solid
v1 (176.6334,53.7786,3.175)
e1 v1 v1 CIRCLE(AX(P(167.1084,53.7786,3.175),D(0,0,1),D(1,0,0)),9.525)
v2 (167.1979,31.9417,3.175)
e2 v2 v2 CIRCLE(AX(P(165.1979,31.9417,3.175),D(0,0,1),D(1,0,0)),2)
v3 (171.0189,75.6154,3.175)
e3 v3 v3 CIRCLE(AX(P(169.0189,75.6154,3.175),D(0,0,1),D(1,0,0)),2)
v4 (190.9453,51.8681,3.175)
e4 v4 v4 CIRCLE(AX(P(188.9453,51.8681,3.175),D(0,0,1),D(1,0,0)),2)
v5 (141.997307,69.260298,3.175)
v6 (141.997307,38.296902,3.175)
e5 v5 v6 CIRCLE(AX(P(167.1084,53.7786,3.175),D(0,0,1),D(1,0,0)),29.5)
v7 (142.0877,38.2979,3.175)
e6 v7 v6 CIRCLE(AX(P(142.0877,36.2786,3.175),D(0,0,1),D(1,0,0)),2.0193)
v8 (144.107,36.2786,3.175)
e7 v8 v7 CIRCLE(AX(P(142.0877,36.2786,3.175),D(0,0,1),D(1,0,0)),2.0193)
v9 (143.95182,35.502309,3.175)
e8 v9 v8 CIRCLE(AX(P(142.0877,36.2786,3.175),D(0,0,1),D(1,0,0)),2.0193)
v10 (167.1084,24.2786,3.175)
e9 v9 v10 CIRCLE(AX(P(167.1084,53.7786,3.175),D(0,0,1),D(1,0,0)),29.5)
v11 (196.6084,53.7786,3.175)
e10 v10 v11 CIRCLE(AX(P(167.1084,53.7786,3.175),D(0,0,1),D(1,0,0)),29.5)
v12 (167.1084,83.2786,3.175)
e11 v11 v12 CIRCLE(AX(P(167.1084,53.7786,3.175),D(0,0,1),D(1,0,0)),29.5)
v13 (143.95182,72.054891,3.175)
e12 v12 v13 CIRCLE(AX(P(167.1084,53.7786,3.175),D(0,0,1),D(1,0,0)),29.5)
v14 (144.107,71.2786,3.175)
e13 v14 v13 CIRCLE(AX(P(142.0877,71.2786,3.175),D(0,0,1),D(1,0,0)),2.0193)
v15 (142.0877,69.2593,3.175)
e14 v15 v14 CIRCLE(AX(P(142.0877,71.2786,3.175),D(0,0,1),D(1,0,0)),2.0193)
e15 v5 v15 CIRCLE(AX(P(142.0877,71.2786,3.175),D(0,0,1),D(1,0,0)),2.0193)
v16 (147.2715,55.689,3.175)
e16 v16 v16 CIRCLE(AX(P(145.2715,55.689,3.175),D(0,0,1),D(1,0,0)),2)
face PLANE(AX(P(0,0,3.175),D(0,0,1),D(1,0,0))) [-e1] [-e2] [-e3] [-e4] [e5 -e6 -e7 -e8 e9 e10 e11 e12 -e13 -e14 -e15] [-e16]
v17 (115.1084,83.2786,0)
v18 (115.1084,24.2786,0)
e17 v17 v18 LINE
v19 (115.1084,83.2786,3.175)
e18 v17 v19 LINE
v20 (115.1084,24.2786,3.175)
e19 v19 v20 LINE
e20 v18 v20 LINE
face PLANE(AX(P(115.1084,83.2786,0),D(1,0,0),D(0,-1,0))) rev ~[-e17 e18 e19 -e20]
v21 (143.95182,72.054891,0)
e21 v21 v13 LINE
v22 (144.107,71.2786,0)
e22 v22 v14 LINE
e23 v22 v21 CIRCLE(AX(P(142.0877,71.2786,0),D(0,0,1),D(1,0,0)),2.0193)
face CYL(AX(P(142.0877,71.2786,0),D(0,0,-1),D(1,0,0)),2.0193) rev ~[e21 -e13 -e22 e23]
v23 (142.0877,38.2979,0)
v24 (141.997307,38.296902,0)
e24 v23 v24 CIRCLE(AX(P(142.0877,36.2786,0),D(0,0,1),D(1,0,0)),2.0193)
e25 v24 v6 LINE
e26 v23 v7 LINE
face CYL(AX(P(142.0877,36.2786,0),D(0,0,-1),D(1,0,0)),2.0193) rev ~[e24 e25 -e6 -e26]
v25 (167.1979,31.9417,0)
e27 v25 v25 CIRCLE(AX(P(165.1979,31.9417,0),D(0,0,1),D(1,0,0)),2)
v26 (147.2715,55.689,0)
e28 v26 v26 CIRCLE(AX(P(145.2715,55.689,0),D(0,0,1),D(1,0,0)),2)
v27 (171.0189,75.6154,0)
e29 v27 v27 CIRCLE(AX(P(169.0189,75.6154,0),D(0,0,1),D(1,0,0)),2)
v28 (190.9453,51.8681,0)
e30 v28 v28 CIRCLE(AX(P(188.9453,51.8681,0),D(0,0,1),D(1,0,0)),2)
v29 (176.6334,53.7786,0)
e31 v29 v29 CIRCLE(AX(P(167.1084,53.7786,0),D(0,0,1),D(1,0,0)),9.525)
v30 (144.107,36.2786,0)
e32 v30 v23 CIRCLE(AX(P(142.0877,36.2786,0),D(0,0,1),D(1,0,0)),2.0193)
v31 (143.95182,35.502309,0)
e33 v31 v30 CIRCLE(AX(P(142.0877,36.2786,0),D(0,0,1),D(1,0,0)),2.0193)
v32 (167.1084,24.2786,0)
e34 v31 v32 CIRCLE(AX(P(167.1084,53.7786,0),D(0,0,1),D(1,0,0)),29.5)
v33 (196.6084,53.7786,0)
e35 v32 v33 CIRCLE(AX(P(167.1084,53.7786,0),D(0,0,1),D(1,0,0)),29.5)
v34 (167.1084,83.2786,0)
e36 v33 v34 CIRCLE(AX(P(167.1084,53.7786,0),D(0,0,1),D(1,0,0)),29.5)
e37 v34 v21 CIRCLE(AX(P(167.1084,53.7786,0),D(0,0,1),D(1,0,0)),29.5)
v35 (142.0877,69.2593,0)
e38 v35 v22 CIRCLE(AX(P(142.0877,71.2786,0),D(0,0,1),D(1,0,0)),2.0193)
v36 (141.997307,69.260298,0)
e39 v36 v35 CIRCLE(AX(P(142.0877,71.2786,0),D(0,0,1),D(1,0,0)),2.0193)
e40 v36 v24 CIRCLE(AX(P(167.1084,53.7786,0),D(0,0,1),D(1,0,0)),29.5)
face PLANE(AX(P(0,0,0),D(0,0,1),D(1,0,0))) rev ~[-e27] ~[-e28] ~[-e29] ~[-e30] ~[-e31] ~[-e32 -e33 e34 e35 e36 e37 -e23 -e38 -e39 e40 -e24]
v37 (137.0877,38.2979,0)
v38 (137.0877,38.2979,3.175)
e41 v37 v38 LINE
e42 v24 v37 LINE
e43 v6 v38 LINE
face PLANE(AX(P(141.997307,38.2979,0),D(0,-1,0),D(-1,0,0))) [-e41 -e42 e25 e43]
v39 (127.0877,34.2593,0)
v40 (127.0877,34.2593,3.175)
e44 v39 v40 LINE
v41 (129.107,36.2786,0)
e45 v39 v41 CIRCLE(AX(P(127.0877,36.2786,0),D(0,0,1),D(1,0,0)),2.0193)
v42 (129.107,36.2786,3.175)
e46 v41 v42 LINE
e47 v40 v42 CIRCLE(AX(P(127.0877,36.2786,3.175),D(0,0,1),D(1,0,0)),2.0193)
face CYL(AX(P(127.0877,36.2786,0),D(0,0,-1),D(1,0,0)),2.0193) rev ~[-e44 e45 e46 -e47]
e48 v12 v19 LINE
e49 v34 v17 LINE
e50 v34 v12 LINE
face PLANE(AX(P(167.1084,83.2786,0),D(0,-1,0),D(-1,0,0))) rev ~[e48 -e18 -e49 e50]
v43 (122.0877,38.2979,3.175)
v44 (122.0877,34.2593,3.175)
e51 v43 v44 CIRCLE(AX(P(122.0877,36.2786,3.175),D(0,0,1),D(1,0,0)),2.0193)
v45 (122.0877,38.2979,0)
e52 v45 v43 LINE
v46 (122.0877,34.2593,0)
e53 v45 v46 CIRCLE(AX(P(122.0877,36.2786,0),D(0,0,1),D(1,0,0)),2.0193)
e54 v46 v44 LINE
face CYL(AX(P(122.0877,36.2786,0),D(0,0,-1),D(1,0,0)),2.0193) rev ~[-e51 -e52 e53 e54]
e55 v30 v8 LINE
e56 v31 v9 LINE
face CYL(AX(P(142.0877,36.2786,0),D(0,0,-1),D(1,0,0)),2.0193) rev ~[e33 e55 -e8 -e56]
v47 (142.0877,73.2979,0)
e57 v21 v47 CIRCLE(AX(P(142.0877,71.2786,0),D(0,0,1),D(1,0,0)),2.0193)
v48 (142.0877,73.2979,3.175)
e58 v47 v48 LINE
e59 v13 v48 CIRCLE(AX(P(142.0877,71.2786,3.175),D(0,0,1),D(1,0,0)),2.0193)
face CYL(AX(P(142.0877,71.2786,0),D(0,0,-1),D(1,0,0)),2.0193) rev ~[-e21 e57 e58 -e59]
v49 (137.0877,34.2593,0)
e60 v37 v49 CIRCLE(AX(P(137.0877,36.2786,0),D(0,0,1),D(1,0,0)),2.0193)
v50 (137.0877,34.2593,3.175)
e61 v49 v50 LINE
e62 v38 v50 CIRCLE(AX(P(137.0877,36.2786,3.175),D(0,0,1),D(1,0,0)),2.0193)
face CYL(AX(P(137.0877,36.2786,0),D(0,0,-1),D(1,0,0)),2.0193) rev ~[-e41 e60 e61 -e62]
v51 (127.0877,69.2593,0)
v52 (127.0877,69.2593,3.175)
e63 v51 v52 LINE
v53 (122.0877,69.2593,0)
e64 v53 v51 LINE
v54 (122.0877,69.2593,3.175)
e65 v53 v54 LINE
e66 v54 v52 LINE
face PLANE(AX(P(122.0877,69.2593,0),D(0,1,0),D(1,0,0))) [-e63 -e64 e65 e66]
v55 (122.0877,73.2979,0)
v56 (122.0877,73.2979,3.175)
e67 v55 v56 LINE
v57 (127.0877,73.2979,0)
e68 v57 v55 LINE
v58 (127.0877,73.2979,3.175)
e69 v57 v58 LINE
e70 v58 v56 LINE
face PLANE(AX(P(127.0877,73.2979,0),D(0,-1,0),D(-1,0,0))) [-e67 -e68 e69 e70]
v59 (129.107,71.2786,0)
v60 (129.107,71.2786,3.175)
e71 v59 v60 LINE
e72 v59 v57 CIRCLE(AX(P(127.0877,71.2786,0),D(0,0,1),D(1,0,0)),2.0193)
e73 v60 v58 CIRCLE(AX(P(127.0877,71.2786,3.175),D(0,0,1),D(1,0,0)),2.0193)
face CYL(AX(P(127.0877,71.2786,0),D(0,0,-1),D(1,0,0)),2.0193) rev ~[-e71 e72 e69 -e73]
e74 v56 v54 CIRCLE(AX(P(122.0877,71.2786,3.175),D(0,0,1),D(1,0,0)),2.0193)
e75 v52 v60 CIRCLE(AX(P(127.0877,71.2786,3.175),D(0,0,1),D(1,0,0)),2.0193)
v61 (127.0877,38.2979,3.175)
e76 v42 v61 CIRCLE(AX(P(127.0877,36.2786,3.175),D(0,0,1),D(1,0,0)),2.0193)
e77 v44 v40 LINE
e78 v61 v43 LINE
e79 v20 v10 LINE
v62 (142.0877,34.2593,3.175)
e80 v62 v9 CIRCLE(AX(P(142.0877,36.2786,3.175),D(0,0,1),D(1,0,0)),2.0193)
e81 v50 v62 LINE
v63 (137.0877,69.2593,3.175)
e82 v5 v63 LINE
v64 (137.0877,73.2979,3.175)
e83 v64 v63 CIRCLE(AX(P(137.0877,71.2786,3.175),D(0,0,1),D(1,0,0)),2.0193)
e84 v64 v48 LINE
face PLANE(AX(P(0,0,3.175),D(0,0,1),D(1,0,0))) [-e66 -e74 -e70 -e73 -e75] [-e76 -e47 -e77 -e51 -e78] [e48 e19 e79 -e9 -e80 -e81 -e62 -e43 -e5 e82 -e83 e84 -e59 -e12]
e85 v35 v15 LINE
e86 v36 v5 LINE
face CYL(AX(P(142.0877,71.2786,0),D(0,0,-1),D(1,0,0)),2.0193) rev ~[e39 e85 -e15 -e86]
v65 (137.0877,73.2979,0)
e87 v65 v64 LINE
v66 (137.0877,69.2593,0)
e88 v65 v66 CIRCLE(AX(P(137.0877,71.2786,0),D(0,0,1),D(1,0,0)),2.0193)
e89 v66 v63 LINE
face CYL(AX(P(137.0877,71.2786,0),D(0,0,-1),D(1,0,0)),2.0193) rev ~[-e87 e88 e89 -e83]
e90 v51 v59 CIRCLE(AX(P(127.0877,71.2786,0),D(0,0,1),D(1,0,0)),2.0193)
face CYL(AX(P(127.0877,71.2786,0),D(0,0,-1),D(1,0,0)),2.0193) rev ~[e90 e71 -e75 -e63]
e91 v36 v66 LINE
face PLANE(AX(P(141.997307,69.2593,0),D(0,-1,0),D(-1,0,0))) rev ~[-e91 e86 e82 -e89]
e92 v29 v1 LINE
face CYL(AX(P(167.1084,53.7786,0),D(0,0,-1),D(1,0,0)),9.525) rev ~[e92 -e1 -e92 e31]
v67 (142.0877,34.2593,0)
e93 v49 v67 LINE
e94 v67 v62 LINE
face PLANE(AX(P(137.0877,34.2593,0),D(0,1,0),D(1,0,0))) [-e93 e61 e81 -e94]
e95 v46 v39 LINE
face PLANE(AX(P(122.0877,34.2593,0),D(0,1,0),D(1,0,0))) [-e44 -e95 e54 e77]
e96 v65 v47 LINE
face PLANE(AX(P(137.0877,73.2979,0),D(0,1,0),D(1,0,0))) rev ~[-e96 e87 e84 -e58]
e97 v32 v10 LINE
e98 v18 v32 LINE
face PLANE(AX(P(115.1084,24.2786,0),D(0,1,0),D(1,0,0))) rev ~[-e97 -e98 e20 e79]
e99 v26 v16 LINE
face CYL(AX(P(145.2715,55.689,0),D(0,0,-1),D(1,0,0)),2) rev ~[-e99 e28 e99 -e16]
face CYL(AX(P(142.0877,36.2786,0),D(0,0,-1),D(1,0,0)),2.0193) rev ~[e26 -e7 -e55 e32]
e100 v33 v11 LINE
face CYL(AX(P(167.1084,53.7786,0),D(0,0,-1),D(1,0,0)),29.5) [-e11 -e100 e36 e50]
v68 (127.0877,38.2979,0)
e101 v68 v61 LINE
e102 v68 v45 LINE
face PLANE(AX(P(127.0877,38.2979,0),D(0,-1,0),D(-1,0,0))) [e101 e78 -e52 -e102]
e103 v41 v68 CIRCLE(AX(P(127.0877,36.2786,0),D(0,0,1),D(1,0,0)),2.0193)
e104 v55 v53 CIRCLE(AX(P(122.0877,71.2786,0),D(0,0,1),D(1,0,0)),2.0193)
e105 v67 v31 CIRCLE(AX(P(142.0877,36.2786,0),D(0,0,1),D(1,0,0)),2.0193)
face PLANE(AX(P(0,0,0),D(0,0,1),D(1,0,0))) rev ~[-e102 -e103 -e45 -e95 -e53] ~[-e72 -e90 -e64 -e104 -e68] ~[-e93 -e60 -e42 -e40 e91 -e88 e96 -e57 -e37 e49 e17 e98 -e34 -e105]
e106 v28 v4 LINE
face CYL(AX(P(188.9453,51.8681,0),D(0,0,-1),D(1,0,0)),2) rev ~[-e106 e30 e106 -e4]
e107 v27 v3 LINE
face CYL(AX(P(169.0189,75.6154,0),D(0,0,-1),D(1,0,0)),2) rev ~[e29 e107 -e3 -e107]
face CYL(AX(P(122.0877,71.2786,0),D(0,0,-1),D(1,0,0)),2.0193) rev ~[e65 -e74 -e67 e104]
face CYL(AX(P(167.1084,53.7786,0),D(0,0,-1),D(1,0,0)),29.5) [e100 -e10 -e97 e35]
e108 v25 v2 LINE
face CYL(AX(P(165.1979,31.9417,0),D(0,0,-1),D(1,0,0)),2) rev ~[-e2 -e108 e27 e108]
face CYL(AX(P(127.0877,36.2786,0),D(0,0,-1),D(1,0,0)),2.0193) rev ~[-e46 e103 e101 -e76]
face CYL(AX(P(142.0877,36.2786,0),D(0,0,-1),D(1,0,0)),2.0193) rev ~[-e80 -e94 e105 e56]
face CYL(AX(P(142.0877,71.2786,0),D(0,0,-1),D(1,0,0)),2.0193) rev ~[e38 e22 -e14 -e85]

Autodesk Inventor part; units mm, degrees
ref_plane "YZ Plane" through (0, 0, 0) normal (1, 0, 0) x (0, 1, 0)
ref_plane "XZ Plane" through (0, 0, 0) normal (0, 1, 0) x (-1, 0, 0)
ref_plane "XY Plane" through (0, 0, 0) normal (0, 0, 1) x (1, 0, 0)
sketch "Sketch1" plane through (0, 0, 0) normal (0, 0, 1) x (1, 0, 0)
  circle A0 centre (167.1084, 53.7786) radius 29.5
  line L0 (167.1084, 83.2786) -> (115.1084, 83.2786)
  line L1 (115.1084, 83.2786) -> (115.1084, 24.2786)
  line L2 (115.1084, 24.2786) -> (167.1084, 24.2786)
  circle A1 centre (167.1084, 53.7786) radius 9.525
  circle A2 centre (145.2715, 55.689) radius 2
  circle A3 centre (169.0189, 75.6154) radius 2
  circle A4 centre (188.9453, 51.8681) radius 2
  circle A5 centre (165.1979, 31.9417) radius 2
  line L3 (169.0189, 75.6154) -> (165.1979, 31.9417) construction
  line L4 (188.9453, 51.8681) -> (145.2715, 55.689) construction
  line L5 (-39.3217, 0) -> (235.9301, 0) projected
  line L6 (0, -16.6557) -> (0, 99.9343) projected
  line L7 (167.1084, 53.7786) -> (100.0684, 53.7786) construction
  circle A6 centre (122.0877, 71.2786) radius 2.0193
  circle A7 centre (127.0877, 71.2786) radius 2.0193
  circle A8 centre (137.0877, 71.2786) radius 2.0193
  circle A9 centre (142.0877, 71.2786) radius 2.0193
  circle A10 centre (127.0877, 36.2786) radius 2.0193
  circle A11 centre (122.0877, 36.2786) radius 2.0193
  circle A12 centre (142.0877, 36.2786) radius 2.0193
  circle A13 centre (137.0877, 36.2786) radius 2.0193
  line L8 (127.0877, 73.2979) -> (122.0877, 73.2979)
  line L9 (122.0877, 69.2593) -> (127.0877, 69.2593)
  line L10 (137.0877, 73.2979) -> (142.0877, 73.2979)
  line L11 (142.0877, 69.2593) -> (137.0877, 69.2593)
  line L12 (142.0877, 38.2979) -> (137.0877, 38.2979)
  line L13 (137.0877, 34.2593) -> (142.0877, 34.2593)
  line L14 (127.0877, 38.2979) -> (122.0877, 38.2979)
  line L15 (122.0877, 34.2593) -> (127.0877, 34.2593)
  circle A14 centre (125.0684, 71.2786) radius 2.0193 construction
  circle A15 centre (125.0684, 36.2786) radius 2.0193 construction
  line L16 (125.0684, 71.2786) -> (125.0684, 36.2786) construction
  circle A16 centre (140.0684, 36.2786) radius 2.0193 construction
  circle A17 centre (140.0684, 71.2786) radius 2.0193 construction
  line L17 (140.0684, 71.2786) -> (140.0684, 36.2786) construction
  point P0 (0, 0)
  dimension "d0" = 59
  dimension "d1" = 52
  dimension "d2" = 19.05
  dimension "d3" = 4
  dimension "d4" = 4
  dimension "d5" = 4
  dimension "d6" = 4
  dimension "d7" = 355
  dimension "d8" = 31
  dimension "d9" = 31
  dimension "d10" = 31
  dimension "d11" = 67.04
  dimension "d13" = 4.0386
  dimension "d14" = 4.0386
  dimension "d16" = 4.0386
  dimension "d17" = 4.0386
  dimension "d18" = 4.0386
  dimension "d19" = 4.0386
  dimension "d20" = 4.0386
  dimension "d21" = 4.0386
  dimension "d22" = 5
  dimension "d23" = 5
  dimension "d24" = 5
  dimension "d25" = 5
  dimension "d26" = 4.0386
  dimension "d27" = 25
  dimension "d29" = 15
  dimension "d32" = 35
extrude "Extrusion1" add sketch "Sketch1" along normal blind 3.175 contours A0 A12 A9 | A0 A9 L10 A8 L11 L12 A13 L13 A12 L2 L1 L0
properties part number "MMplate2"
